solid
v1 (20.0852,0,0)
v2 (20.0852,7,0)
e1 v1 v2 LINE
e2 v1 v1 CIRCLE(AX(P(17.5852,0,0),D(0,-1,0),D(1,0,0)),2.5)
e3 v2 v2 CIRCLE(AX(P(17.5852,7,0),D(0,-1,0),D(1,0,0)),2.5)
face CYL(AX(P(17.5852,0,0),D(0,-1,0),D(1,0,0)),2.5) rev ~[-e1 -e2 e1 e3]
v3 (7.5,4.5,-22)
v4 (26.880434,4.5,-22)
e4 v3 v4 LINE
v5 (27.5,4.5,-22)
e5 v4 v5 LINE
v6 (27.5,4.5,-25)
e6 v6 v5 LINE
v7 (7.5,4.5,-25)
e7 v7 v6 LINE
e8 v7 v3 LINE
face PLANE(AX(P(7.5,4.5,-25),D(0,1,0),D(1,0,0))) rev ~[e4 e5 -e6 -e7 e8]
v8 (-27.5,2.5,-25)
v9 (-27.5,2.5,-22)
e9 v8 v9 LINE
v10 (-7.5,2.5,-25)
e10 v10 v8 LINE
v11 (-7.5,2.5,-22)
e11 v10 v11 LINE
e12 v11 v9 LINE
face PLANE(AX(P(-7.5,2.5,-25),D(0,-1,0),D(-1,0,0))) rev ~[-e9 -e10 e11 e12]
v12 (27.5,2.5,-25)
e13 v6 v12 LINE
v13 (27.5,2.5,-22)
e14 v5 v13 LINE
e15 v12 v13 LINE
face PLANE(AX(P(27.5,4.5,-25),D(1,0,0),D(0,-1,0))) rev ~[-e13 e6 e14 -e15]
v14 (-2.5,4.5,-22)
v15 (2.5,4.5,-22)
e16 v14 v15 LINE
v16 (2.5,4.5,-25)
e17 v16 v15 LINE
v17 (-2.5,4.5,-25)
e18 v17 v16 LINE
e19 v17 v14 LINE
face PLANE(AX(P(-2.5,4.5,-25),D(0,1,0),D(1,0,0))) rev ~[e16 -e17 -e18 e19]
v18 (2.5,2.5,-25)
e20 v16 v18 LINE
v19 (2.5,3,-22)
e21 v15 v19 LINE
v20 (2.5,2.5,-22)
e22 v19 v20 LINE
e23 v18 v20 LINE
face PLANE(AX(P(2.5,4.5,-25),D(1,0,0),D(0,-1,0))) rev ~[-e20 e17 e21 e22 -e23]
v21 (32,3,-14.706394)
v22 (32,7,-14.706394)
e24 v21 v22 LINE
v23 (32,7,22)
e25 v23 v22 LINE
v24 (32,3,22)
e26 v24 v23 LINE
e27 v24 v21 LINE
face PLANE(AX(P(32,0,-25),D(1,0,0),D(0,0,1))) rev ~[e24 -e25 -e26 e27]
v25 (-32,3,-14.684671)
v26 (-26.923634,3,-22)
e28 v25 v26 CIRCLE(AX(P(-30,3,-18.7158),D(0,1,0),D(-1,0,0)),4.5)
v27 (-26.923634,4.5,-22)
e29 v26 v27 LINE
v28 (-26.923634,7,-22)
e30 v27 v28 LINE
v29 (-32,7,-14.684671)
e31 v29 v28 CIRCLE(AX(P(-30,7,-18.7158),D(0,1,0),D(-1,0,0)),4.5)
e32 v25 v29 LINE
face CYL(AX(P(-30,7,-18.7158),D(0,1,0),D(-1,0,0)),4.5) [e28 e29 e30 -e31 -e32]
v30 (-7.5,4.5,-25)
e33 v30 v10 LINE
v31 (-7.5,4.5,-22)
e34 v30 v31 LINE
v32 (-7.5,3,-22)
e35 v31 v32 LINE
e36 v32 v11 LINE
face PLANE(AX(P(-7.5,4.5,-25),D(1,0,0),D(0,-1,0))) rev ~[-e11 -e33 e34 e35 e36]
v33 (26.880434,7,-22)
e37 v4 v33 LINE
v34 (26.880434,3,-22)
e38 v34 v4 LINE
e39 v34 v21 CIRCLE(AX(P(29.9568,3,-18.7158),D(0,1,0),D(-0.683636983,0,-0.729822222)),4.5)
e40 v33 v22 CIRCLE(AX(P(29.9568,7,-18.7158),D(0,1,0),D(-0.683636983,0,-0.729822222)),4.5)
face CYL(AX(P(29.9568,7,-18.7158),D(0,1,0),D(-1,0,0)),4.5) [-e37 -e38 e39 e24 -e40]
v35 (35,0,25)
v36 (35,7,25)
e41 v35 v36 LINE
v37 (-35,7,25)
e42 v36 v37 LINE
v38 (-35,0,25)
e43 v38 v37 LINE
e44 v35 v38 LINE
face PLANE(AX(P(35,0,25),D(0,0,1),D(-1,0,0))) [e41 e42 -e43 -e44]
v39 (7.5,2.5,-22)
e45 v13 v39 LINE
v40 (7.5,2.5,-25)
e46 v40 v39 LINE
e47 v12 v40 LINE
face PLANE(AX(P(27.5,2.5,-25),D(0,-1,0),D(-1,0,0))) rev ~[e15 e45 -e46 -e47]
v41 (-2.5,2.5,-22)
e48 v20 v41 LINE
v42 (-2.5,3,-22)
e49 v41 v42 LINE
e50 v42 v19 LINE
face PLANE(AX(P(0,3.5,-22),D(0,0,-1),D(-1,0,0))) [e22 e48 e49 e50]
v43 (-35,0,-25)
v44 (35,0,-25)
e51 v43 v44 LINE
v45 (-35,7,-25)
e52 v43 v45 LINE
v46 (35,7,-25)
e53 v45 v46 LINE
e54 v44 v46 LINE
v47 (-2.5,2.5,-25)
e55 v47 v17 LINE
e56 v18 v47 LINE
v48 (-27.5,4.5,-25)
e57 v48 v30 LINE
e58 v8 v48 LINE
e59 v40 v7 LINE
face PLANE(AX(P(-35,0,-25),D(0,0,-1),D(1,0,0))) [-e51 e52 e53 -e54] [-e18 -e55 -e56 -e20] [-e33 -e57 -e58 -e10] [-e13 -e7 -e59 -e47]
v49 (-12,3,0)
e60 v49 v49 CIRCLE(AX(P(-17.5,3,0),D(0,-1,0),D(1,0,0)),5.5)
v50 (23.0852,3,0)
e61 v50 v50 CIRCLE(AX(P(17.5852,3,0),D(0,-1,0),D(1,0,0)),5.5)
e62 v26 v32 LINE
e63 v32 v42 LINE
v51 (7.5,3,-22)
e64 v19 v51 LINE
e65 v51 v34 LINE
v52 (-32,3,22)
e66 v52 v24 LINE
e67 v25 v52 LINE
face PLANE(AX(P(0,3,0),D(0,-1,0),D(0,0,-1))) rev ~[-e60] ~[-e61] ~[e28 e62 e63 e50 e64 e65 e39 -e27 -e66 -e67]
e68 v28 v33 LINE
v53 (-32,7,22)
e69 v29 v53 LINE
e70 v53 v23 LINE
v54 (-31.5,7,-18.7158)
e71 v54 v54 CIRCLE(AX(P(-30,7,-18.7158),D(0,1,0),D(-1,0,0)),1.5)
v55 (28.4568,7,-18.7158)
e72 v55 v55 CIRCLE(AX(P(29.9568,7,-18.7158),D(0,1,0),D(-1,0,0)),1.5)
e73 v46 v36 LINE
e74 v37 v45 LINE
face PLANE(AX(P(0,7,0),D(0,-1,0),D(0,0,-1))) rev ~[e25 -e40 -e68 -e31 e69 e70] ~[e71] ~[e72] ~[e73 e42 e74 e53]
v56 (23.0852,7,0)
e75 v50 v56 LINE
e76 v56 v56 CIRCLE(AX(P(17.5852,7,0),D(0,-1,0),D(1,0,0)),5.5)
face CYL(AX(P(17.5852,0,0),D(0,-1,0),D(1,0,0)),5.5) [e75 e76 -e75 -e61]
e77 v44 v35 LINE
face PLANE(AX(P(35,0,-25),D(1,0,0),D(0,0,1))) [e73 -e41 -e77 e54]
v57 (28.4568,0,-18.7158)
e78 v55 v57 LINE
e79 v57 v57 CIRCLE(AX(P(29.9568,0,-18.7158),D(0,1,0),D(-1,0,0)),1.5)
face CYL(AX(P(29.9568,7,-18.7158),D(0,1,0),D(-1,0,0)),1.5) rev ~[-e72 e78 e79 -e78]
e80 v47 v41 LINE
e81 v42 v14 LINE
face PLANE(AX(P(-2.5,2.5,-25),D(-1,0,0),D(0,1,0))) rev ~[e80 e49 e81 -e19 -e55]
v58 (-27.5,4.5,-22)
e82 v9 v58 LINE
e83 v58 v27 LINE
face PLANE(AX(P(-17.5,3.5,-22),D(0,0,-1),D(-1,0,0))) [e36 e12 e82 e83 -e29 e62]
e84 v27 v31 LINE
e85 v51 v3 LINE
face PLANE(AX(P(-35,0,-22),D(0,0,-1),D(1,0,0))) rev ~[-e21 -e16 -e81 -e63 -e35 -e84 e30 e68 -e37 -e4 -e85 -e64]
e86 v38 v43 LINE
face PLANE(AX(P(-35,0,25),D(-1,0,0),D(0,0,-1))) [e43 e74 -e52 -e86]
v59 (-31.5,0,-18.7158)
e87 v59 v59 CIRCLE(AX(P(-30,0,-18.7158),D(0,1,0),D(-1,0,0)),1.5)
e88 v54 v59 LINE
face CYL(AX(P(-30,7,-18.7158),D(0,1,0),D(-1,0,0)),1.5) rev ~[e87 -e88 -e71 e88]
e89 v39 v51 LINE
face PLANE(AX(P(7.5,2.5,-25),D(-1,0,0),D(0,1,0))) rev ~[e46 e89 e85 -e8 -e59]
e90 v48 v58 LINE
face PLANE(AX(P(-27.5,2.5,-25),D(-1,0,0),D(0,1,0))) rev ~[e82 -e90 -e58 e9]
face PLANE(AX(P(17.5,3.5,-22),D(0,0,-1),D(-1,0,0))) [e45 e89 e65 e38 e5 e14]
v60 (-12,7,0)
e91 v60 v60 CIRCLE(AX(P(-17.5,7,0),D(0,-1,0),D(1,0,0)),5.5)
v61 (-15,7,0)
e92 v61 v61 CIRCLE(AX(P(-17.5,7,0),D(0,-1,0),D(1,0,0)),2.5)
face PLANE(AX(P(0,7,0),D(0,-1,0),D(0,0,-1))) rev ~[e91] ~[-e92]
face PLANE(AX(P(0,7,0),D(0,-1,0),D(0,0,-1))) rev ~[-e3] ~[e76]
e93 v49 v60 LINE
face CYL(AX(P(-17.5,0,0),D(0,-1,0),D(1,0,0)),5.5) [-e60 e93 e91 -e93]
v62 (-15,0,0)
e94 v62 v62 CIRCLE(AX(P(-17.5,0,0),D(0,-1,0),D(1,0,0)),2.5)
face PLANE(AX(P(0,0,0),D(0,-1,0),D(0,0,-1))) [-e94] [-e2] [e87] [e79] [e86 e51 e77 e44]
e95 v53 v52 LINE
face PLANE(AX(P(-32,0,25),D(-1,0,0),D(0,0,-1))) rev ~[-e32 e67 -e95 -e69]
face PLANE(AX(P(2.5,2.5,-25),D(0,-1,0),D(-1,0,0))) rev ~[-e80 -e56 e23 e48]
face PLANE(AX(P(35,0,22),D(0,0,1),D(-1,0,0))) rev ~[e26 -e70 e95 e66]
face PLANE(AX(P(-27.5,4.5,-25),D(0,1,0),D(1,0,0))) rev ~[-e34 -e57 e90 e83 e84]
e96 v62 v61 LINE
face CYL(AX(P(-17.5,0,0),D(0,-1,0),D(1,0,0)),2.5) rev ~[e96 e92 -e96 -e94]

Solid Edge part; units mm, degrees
sketch "Sketch1" plane through (0, 0, 0) normal (0, -1, 0) x (1, 0, 0)
  line L0 (35, 25) -> (-35, 25)
  line L1 (-35, 25) -> (-35, -25)
  line L2 (-35, -25) -> (35, -25)
  line L3 (35, -25) -> (35, 25)
extrude "Protrusion1" add sketch "Sketch1" against normal blind 7
sketch "Sketch2" plane through (0, 0, 0) normal (0, -1, 0) x (1, 0, 0)
  circle A0 centre (17.5852, 0) radius 2.5
extrude "ExtrudedCutout_1" cut sketch "Sketch2" against normal blind 7
sketch "Sketch3" plane through (0, 0, 0) normal (0, -1, 0) x (1, 0, 0)
  circle A0 centre (-17.5, 0) radius 2.5
extrude "ExtrudedCutout_2" cut sketch "Sketch3" against normal blind 7
sketch "Sketch4" plane through (0, 7, 0) normal (0, 1, 0) x (-1, 0, 0)
  circle A0 centre (-29.9568, -18.7158) radius 1.5
extrude "ExtrudedCutout_3" cut sketch "Sketch4" against normal blind 7
sketch "Sketch5" plane through (0, 7, 0) normal (0, 1, 0) x (-1, 0, 0)
  circle A0 centre (30, -18.7158) radius 1.5
extrude "ExtrudedCutout_4" cut sketch "Sketch5" against normal blind 7
shell "Thinwall_2" thickness 3 removed faces 1 at (-22.6333, 7, 17.1667)
sketch "Sketch6" plane through (0, 3.5, -25) normal (0, 0, -1) x (-1, 0, 0)
  line L0 (-7.5, 1) -> (-27.5, 1)
  line L1 (-27.5, 1) -> (-27.5, -1)
  line L2 (-27.5, -1) -> (-7.5, -1)
  line L3 (-7.5, -1) -> (-7.5, 1)
extrude "ExtrudedCutout_6" cut sketch "Sketch6" against normal blind 3
sketch "Sketch7" plane through (0, 3.5, -25) normal (0, 0, -1) x (-1, 0, 0)
  line L0 (2.5, -1) -> (2.5, 1)
  line L1 (2.5, 1) -> (-2.5, 1)
  line L2 (-2.5, 1) -> (-2.5, -1)
  line L3 (-2.5, -1) -> (2.5, -1)
extrude "ExtrudedCutout_7" cut sketch "Sketch7" against normal blind 3
sketch "Sketch8" plane through (0, 3.5, -25) normal (0, 0, -1) x (-1, 0, 0)
  line L0 (27.5, 1) -> (7.5, 1)
  line L1 (7.5, 1) -> (7.5, -1)
  line L2 (7.5, -1) -> (27.5, -1)
  line L3 (27.5, -1) -> (27.5, 1)
extrude "ExtrudedCutout_8" cut sketch "Sketch8" against normal blind 3
